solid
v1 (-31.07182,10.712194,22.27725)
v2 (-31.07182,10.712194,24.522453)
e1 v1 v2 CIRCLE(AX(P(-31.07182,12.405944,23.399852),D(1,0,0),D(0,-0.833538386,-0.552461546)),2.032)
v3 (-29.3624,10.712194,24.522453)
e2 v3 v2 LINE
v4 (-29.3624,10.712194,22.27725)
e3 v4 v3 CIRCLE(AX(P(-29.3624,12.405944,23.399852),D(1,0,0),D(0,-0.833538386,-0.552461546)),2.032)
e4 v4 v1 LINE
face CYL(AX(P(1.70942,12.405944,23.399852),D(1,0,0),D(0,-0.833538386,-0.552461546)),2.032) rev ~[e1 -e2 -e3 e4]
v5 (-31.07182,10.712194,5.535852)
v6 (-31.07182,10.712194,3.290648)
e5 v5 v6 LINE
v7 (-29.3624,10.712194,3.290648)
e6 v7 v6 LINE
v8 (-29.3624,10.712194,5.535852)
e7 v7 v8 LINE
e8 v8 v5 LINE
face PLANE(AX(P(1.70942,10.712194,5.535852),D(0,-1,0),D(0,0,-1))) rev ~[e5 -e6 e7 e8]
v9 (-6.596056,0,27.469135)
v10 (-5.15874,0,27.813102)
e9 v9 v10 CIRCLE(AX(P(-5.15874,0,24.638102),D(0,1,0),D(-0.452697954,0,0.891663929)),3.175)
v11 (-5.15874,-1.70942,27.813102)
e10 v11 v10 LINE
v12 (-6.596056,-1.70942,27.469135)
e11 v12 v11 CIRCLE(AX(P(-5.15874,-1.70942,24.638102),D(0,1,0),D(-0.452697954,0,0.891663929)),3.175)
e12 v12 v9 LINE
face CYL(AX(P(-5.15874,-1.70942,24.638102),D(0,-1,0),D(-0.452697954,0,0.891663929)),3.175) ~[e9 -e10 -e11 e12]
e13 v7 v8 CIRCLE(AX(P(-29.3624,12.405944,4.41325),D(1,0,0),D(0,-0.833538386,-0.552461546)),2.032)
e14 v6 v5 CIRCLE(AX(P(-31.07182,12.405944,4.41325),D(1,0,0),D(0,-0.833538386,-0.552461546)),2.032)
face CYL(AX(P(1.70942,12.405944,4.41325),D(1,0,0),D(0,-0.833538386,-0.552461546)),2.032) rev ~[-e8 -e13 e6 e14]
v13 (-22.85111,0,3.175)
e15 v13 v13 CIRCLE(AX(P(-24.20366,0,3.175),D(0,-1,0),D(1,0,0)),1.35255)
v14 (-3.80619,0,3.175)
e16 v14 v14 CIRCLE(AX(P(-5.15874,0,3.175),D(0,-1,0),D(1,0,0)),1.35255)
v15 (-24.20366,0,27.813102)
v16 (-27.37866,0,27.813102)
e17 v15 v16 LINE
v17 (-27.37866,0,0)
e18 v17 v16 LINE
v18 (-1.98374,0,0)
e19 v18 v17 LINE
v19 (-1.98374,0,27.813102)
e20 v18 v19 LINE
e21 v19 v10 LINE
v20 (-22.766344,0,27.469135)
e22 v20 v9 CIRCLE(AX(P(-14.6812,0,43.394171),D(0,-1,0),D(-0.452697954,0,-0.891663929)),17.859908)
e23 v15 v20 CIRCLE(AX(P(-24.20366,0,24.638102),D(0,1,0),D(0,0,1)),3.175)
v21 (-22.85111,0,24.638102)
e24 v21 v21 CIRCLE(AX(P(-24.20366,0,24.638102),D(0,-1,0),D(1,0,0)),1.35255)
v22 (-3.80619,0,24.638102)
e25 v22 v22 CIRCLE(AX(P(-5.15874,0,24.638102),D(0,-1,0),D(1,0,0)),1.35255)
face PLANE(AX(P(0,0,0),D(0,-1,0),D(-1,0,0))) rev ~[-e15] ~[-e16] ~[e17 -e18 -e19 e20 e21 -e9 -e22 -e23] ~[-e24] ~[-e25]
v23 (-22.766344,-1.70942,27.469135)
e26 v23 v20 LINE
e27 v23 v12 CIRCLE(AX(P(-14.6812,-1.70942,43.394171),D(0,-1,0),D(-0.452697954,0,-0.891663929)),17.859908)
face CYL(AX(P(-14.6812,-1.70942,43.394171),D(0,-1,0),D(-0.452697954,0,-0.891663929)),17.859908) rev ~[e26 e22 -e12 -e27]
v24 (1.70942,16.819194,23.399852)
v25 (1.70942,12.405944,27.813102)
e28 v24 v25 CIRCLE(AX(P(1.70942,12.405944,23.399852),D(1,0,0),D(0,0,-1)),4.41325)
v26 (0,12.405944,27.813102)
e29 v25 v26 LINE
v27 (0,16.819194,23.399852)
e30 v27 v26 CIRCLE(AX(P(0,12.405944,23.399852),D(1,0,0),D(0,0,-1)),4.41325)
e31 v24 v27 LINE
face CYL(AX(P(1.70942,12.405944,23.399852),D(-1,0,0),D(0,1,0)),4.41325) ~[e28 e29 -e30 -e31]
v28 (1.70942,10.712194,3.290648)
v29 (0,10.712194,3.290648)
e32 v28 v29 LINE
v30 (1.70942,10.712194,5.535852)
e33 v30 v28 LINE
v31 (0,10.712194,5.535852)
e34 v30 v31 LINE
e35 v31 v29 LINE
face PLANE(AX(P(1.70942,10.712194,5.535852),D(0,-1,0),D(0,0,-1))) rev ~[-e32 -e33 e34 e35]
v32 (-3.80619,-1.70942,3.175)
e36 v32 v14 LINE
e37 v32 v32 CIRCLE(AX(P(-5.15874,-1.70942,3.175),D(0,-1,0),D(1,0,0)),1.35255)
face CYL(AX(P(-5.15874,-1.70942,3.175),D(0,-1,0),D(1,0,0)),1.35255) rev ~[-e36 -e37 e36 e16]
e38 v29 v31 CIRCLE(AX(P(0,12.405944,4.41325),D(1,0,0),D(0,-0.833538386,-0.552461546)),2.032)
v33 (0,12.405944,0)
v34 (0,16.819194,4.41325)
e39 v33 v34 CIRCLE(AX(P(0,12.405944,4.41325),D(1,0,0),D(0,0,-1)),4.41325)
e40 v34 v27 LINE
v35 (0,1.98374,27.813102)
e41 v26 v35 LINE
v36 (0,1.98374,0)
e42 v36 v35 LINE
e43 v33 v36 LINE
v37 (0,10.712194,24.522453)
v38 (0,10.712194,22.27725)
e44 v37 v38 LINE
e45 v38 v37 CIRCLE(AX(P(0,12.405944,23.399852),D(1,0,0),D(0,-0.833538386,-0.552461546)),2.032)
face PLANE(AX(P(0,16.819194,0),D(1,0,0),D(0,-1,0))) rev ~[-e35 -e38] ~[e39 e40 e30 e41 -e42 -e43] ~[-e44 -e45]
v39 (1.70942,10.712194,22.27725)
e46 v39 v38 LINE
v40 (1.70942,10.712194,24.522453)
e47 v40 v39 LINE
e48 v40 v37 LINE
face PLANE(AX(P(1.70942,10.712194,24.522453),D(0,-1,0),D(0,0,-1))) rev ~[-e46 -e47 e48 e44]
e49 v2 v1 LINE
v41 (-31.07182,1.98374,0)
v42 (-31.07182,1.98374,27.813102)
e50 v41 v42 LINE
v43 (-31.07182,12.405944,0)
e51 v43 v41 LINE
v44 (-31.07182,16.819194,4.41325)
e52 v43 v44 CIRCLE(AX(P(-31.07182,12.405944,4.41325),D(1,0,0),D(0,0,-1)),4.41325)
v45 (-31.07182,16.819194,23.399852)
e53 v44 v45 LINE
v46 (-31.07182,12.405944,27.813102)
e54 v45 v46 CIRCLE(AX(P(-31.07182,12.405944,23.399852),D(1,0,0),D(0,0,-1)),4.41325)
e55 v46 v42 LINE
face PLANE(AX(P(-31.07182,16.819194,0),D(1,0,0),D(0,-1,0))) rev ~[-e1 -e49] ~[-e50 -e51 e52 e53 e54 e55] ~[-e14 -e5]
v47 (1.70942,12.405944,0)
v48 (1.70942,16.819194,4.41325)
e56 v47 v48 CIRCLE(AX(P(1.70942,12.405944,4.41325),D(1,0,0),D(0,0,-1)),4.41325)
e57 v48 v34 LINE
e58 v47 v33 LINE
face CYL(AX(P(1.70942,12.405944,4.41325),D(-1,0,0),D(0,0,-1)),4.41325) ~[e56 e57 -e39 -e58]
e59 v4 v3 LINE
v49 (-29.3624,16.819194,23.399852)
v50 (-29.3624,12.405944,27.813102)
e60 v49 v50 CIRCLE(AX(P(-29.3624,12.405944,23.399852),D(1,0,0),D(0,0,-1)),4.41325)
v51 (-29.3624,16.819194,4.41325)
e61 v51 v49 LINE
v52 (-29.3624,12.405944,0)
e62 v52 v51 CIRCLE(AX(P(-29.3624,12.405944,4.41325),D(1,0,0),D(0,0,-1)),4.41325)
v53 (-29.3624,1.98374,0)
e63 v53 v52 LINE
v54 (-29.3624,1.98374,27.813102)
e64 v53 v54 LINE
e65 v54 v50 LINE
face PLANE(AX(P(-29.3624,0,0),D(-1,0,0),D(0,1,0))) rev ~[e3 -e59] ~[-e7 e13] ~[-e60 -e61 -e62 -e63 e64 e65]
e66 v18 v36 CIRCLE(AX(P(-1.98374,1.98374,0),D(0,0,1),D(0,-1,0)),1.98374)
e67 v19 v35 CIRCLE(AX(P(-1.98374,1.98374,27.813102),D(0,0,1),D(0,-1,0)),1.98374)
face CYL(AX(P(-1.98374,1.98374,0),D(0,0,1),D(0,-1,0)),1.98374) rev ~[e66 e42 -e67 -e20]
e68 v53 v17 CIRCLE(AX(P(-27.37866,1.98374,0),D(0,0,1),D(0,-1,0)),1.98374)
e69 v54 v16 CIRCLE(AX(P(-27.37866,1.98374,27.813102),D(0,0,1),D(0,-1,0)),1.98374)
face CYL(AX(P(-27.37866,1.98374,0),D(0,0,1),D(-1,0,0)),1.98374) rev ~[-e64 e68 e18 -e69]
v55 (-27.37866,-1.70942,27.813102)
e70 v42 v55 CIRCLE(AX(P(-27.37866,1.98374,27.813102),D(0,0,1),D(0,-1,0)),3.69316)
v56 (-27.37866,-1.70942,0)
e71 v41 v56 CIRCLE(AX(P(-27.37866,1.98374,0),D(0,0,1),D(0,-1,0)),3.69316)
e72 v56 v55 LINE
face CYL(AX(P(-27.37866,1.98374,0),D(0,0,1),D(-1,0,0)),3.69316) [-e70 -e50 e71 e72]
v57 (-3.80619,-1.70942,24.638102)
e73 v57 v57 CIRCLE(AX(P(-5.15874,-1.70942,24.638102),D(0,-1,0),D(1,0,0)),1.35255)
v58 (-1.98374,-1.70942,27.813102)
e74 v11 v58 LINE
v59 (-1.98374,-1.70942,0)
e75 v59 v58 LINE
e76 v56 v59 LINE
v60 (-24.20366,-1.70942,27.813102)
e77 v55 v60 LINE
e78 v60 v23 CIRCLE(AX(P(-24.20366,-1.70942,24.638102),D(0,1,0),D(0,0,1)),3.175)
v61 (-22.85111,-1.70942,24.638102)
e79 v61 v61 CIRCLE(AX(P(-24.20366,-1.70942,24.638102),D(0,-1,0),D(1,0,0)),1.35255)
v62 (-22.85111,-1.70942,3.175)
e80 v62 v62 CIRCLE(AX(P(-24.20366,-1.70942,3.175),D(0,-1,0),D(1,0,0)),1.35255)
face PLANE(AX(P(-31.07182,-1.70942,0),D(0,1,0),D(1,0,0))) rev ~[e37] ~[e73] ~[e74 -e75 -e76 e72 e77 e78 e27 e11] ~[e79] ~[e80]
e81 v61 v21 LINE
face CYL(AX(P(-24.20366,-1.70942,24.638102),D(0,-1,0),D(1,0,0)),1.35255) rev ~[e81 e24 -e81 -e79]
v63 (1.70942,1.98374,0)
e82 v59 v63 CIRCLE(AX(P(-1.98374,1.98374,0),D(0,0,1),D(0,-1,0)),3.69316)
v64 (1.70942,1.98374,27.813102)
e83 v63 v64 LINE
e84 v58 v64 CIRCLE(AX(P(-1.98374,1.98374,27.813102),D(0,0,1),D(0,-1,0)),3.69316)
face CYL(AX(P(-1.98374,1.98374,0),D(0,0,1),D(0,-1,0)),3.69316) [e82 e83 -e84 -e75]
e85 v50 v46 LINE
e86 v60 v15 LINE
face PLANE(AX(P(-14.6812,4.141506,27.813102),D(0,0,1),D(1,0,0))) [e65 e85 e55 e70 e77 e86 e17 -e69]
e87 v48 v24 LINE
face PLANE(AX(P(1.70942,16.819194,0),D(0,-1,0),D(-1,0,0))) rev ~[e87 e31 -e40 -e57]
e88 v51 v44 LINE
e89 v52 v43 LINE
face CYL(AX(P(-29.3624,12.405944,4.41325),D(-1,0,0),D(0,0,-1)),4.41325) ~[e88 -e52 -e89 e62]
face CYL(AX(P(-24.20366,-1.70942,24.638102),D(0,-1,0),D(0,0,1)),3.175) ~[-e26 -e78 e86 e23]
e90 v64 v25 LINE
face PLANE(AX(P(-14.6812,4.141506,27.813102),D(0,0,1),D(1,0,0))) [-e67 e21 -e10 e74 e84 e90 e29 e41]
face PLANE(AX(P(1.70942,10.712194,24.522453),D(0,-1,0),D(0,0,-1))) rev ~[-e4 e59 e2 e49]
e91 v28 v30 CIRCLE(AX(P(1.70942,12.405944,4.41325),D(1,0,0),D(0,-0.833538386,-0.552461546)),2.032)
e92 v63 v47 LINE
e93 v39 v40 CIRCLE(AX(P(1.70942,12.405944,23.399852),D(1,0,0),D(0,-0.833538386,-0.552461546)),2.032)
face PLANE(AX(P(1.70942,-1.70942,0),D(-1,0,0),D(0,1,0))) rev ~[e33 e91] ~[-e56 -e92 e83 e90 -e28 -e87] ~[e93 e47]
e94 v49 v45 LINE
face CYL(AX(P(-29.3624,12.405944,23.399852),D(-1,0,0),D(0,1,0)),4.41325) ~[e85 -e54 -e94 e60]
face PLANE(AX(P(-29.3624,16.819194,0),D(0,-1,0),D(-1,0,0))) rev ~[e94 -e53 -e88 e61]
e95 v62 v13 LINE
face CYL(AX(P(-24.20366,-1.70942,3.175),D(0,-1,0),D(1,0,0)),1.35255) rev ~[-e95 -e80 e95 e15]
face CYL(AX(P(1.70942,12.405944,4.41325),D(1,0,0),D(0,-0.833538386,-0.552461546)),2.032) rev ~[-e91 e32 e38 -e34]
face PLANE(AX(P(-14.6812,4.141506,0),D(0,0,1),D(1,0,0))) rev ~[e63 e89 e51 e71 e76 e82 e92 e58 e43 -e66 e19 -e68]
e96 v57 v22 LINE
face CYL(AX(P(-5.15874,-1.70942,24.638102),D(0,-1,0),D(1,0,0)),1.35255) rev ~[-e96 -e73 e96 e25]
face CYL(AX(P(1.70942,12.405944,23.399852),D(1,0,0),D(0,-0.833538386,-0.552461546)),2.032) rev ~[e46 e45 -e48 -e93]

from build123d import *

# Parameters (mm, degrees)
F1_DEPTH = 27.8131016
F2_R     = 3.69316
F3_R     = 1.98374
F5_DEPTH = 32.78124
F6_R     = 1.35255
F7_DEPTH = 1.70942
F8_R     = 4.41325


with BuildPart() as f1:
    # F0 (on Top) → F1 (new body)
    with BuildSketch(Plane.XY):
        Polygon((0, 16.8191942), (0, 0), (-29.3624, 0), (-29.3624, 16.8191942), (-31.07182, 16.8191942), (-31.07182, -1.70942), (1.70942, -1.70942), (1.70942, 16.8191942), align=None)
    extrude(amount=F1_DEPTH)

    # F2
    f2_edges = [f1.edges().sort_by_distance(p)[0] for p in [
        (1.70942, -1.70942, 13.906551),
        (-31.07182, -1.70942, 13.906551),
    ]]
    fillet(f2_edges, radius=F2_R)

    # F3
    f3_edges = [f1.edges().sort_by_distance(p)[0] for p in [
        (0, 0, 13.906551),
        (-29.3624, 0, 13.906551),
    ]]
    fillet(f3_edges, radius=F3_R)

    # F4 (on face) → F5 (cut, through all)
    with BuildSketch(Plane.YZ.offset(1.70942)):
        with BuildLine():
            Line((10.7121942, 24.5224534606), (10.7121942, 22.2772497394))
            ThreePointArc((10.7121942, 22.2772497394), (14.4379442, 23.3998516), (10.7121942, 24.5224534606))
        make_face()
        with BuildLine():
            Line((10.7121942, 5.5358518606), (10.7121942, 3.2906481394))
            ThreePointArc((10.7121942, 3.2906481394), (14.4379442, 4.41325), (10.7121942, 5.5358518606))
        make_face()
    extrude(amount=-F5_DEPTH, mode=Mode.SUBTRACT)

    # F6 (on face) → F7 (cut, through all)
    with BuildSketch(Plane.XZ.offset(1.70942)):
        with BuildLine():
            ThreePointArc((-6.5960560047, 27.4691345745), (-5.8976903725, 27.7259126932), (-5.15874, 27.8131016))
            Line((-5.15874, 27.8131016), (-24.20366, 27.8131016))
            ThreePointArc((-24.20366, 27.8131016), (-23.4647096275, 27.7259126932), (-22.7663439953, 27.4691345745))
            ThreePointArc((-22.7663439953, 27.4691345745), (-14.6812, 25.5342622696), (-6.5960560047, 27.4691345745))
        make_face()
        with Locations((-24.20366, 24.6381016)):
            Circle(F6_R)
        with Locations((-5.15874, 24.6381016)):
            Circle(F6_R)
        with Locations((-24.20366, 3.175)):
            Circle(F6_R)
        with Locations((-5.15874, 3.175)):
            Circle(F6_R)
    extrude(amount=-F7_DEPTH, mode=Mode.SUBTRACT)

    # F8
    f8_edges = [f1.edges().sort_by_distance(p)[0] for p in [
        (0.85471, 16.819194, 27.813102),
        (-30.21711, 16.819194, 27.813102),
        (0.85471, 16.819194, 0),
        (-30.21711, 16.819194, 0),
    ]]
    fillet(f8_edges, radius=F8_R)


solid = f1.part
